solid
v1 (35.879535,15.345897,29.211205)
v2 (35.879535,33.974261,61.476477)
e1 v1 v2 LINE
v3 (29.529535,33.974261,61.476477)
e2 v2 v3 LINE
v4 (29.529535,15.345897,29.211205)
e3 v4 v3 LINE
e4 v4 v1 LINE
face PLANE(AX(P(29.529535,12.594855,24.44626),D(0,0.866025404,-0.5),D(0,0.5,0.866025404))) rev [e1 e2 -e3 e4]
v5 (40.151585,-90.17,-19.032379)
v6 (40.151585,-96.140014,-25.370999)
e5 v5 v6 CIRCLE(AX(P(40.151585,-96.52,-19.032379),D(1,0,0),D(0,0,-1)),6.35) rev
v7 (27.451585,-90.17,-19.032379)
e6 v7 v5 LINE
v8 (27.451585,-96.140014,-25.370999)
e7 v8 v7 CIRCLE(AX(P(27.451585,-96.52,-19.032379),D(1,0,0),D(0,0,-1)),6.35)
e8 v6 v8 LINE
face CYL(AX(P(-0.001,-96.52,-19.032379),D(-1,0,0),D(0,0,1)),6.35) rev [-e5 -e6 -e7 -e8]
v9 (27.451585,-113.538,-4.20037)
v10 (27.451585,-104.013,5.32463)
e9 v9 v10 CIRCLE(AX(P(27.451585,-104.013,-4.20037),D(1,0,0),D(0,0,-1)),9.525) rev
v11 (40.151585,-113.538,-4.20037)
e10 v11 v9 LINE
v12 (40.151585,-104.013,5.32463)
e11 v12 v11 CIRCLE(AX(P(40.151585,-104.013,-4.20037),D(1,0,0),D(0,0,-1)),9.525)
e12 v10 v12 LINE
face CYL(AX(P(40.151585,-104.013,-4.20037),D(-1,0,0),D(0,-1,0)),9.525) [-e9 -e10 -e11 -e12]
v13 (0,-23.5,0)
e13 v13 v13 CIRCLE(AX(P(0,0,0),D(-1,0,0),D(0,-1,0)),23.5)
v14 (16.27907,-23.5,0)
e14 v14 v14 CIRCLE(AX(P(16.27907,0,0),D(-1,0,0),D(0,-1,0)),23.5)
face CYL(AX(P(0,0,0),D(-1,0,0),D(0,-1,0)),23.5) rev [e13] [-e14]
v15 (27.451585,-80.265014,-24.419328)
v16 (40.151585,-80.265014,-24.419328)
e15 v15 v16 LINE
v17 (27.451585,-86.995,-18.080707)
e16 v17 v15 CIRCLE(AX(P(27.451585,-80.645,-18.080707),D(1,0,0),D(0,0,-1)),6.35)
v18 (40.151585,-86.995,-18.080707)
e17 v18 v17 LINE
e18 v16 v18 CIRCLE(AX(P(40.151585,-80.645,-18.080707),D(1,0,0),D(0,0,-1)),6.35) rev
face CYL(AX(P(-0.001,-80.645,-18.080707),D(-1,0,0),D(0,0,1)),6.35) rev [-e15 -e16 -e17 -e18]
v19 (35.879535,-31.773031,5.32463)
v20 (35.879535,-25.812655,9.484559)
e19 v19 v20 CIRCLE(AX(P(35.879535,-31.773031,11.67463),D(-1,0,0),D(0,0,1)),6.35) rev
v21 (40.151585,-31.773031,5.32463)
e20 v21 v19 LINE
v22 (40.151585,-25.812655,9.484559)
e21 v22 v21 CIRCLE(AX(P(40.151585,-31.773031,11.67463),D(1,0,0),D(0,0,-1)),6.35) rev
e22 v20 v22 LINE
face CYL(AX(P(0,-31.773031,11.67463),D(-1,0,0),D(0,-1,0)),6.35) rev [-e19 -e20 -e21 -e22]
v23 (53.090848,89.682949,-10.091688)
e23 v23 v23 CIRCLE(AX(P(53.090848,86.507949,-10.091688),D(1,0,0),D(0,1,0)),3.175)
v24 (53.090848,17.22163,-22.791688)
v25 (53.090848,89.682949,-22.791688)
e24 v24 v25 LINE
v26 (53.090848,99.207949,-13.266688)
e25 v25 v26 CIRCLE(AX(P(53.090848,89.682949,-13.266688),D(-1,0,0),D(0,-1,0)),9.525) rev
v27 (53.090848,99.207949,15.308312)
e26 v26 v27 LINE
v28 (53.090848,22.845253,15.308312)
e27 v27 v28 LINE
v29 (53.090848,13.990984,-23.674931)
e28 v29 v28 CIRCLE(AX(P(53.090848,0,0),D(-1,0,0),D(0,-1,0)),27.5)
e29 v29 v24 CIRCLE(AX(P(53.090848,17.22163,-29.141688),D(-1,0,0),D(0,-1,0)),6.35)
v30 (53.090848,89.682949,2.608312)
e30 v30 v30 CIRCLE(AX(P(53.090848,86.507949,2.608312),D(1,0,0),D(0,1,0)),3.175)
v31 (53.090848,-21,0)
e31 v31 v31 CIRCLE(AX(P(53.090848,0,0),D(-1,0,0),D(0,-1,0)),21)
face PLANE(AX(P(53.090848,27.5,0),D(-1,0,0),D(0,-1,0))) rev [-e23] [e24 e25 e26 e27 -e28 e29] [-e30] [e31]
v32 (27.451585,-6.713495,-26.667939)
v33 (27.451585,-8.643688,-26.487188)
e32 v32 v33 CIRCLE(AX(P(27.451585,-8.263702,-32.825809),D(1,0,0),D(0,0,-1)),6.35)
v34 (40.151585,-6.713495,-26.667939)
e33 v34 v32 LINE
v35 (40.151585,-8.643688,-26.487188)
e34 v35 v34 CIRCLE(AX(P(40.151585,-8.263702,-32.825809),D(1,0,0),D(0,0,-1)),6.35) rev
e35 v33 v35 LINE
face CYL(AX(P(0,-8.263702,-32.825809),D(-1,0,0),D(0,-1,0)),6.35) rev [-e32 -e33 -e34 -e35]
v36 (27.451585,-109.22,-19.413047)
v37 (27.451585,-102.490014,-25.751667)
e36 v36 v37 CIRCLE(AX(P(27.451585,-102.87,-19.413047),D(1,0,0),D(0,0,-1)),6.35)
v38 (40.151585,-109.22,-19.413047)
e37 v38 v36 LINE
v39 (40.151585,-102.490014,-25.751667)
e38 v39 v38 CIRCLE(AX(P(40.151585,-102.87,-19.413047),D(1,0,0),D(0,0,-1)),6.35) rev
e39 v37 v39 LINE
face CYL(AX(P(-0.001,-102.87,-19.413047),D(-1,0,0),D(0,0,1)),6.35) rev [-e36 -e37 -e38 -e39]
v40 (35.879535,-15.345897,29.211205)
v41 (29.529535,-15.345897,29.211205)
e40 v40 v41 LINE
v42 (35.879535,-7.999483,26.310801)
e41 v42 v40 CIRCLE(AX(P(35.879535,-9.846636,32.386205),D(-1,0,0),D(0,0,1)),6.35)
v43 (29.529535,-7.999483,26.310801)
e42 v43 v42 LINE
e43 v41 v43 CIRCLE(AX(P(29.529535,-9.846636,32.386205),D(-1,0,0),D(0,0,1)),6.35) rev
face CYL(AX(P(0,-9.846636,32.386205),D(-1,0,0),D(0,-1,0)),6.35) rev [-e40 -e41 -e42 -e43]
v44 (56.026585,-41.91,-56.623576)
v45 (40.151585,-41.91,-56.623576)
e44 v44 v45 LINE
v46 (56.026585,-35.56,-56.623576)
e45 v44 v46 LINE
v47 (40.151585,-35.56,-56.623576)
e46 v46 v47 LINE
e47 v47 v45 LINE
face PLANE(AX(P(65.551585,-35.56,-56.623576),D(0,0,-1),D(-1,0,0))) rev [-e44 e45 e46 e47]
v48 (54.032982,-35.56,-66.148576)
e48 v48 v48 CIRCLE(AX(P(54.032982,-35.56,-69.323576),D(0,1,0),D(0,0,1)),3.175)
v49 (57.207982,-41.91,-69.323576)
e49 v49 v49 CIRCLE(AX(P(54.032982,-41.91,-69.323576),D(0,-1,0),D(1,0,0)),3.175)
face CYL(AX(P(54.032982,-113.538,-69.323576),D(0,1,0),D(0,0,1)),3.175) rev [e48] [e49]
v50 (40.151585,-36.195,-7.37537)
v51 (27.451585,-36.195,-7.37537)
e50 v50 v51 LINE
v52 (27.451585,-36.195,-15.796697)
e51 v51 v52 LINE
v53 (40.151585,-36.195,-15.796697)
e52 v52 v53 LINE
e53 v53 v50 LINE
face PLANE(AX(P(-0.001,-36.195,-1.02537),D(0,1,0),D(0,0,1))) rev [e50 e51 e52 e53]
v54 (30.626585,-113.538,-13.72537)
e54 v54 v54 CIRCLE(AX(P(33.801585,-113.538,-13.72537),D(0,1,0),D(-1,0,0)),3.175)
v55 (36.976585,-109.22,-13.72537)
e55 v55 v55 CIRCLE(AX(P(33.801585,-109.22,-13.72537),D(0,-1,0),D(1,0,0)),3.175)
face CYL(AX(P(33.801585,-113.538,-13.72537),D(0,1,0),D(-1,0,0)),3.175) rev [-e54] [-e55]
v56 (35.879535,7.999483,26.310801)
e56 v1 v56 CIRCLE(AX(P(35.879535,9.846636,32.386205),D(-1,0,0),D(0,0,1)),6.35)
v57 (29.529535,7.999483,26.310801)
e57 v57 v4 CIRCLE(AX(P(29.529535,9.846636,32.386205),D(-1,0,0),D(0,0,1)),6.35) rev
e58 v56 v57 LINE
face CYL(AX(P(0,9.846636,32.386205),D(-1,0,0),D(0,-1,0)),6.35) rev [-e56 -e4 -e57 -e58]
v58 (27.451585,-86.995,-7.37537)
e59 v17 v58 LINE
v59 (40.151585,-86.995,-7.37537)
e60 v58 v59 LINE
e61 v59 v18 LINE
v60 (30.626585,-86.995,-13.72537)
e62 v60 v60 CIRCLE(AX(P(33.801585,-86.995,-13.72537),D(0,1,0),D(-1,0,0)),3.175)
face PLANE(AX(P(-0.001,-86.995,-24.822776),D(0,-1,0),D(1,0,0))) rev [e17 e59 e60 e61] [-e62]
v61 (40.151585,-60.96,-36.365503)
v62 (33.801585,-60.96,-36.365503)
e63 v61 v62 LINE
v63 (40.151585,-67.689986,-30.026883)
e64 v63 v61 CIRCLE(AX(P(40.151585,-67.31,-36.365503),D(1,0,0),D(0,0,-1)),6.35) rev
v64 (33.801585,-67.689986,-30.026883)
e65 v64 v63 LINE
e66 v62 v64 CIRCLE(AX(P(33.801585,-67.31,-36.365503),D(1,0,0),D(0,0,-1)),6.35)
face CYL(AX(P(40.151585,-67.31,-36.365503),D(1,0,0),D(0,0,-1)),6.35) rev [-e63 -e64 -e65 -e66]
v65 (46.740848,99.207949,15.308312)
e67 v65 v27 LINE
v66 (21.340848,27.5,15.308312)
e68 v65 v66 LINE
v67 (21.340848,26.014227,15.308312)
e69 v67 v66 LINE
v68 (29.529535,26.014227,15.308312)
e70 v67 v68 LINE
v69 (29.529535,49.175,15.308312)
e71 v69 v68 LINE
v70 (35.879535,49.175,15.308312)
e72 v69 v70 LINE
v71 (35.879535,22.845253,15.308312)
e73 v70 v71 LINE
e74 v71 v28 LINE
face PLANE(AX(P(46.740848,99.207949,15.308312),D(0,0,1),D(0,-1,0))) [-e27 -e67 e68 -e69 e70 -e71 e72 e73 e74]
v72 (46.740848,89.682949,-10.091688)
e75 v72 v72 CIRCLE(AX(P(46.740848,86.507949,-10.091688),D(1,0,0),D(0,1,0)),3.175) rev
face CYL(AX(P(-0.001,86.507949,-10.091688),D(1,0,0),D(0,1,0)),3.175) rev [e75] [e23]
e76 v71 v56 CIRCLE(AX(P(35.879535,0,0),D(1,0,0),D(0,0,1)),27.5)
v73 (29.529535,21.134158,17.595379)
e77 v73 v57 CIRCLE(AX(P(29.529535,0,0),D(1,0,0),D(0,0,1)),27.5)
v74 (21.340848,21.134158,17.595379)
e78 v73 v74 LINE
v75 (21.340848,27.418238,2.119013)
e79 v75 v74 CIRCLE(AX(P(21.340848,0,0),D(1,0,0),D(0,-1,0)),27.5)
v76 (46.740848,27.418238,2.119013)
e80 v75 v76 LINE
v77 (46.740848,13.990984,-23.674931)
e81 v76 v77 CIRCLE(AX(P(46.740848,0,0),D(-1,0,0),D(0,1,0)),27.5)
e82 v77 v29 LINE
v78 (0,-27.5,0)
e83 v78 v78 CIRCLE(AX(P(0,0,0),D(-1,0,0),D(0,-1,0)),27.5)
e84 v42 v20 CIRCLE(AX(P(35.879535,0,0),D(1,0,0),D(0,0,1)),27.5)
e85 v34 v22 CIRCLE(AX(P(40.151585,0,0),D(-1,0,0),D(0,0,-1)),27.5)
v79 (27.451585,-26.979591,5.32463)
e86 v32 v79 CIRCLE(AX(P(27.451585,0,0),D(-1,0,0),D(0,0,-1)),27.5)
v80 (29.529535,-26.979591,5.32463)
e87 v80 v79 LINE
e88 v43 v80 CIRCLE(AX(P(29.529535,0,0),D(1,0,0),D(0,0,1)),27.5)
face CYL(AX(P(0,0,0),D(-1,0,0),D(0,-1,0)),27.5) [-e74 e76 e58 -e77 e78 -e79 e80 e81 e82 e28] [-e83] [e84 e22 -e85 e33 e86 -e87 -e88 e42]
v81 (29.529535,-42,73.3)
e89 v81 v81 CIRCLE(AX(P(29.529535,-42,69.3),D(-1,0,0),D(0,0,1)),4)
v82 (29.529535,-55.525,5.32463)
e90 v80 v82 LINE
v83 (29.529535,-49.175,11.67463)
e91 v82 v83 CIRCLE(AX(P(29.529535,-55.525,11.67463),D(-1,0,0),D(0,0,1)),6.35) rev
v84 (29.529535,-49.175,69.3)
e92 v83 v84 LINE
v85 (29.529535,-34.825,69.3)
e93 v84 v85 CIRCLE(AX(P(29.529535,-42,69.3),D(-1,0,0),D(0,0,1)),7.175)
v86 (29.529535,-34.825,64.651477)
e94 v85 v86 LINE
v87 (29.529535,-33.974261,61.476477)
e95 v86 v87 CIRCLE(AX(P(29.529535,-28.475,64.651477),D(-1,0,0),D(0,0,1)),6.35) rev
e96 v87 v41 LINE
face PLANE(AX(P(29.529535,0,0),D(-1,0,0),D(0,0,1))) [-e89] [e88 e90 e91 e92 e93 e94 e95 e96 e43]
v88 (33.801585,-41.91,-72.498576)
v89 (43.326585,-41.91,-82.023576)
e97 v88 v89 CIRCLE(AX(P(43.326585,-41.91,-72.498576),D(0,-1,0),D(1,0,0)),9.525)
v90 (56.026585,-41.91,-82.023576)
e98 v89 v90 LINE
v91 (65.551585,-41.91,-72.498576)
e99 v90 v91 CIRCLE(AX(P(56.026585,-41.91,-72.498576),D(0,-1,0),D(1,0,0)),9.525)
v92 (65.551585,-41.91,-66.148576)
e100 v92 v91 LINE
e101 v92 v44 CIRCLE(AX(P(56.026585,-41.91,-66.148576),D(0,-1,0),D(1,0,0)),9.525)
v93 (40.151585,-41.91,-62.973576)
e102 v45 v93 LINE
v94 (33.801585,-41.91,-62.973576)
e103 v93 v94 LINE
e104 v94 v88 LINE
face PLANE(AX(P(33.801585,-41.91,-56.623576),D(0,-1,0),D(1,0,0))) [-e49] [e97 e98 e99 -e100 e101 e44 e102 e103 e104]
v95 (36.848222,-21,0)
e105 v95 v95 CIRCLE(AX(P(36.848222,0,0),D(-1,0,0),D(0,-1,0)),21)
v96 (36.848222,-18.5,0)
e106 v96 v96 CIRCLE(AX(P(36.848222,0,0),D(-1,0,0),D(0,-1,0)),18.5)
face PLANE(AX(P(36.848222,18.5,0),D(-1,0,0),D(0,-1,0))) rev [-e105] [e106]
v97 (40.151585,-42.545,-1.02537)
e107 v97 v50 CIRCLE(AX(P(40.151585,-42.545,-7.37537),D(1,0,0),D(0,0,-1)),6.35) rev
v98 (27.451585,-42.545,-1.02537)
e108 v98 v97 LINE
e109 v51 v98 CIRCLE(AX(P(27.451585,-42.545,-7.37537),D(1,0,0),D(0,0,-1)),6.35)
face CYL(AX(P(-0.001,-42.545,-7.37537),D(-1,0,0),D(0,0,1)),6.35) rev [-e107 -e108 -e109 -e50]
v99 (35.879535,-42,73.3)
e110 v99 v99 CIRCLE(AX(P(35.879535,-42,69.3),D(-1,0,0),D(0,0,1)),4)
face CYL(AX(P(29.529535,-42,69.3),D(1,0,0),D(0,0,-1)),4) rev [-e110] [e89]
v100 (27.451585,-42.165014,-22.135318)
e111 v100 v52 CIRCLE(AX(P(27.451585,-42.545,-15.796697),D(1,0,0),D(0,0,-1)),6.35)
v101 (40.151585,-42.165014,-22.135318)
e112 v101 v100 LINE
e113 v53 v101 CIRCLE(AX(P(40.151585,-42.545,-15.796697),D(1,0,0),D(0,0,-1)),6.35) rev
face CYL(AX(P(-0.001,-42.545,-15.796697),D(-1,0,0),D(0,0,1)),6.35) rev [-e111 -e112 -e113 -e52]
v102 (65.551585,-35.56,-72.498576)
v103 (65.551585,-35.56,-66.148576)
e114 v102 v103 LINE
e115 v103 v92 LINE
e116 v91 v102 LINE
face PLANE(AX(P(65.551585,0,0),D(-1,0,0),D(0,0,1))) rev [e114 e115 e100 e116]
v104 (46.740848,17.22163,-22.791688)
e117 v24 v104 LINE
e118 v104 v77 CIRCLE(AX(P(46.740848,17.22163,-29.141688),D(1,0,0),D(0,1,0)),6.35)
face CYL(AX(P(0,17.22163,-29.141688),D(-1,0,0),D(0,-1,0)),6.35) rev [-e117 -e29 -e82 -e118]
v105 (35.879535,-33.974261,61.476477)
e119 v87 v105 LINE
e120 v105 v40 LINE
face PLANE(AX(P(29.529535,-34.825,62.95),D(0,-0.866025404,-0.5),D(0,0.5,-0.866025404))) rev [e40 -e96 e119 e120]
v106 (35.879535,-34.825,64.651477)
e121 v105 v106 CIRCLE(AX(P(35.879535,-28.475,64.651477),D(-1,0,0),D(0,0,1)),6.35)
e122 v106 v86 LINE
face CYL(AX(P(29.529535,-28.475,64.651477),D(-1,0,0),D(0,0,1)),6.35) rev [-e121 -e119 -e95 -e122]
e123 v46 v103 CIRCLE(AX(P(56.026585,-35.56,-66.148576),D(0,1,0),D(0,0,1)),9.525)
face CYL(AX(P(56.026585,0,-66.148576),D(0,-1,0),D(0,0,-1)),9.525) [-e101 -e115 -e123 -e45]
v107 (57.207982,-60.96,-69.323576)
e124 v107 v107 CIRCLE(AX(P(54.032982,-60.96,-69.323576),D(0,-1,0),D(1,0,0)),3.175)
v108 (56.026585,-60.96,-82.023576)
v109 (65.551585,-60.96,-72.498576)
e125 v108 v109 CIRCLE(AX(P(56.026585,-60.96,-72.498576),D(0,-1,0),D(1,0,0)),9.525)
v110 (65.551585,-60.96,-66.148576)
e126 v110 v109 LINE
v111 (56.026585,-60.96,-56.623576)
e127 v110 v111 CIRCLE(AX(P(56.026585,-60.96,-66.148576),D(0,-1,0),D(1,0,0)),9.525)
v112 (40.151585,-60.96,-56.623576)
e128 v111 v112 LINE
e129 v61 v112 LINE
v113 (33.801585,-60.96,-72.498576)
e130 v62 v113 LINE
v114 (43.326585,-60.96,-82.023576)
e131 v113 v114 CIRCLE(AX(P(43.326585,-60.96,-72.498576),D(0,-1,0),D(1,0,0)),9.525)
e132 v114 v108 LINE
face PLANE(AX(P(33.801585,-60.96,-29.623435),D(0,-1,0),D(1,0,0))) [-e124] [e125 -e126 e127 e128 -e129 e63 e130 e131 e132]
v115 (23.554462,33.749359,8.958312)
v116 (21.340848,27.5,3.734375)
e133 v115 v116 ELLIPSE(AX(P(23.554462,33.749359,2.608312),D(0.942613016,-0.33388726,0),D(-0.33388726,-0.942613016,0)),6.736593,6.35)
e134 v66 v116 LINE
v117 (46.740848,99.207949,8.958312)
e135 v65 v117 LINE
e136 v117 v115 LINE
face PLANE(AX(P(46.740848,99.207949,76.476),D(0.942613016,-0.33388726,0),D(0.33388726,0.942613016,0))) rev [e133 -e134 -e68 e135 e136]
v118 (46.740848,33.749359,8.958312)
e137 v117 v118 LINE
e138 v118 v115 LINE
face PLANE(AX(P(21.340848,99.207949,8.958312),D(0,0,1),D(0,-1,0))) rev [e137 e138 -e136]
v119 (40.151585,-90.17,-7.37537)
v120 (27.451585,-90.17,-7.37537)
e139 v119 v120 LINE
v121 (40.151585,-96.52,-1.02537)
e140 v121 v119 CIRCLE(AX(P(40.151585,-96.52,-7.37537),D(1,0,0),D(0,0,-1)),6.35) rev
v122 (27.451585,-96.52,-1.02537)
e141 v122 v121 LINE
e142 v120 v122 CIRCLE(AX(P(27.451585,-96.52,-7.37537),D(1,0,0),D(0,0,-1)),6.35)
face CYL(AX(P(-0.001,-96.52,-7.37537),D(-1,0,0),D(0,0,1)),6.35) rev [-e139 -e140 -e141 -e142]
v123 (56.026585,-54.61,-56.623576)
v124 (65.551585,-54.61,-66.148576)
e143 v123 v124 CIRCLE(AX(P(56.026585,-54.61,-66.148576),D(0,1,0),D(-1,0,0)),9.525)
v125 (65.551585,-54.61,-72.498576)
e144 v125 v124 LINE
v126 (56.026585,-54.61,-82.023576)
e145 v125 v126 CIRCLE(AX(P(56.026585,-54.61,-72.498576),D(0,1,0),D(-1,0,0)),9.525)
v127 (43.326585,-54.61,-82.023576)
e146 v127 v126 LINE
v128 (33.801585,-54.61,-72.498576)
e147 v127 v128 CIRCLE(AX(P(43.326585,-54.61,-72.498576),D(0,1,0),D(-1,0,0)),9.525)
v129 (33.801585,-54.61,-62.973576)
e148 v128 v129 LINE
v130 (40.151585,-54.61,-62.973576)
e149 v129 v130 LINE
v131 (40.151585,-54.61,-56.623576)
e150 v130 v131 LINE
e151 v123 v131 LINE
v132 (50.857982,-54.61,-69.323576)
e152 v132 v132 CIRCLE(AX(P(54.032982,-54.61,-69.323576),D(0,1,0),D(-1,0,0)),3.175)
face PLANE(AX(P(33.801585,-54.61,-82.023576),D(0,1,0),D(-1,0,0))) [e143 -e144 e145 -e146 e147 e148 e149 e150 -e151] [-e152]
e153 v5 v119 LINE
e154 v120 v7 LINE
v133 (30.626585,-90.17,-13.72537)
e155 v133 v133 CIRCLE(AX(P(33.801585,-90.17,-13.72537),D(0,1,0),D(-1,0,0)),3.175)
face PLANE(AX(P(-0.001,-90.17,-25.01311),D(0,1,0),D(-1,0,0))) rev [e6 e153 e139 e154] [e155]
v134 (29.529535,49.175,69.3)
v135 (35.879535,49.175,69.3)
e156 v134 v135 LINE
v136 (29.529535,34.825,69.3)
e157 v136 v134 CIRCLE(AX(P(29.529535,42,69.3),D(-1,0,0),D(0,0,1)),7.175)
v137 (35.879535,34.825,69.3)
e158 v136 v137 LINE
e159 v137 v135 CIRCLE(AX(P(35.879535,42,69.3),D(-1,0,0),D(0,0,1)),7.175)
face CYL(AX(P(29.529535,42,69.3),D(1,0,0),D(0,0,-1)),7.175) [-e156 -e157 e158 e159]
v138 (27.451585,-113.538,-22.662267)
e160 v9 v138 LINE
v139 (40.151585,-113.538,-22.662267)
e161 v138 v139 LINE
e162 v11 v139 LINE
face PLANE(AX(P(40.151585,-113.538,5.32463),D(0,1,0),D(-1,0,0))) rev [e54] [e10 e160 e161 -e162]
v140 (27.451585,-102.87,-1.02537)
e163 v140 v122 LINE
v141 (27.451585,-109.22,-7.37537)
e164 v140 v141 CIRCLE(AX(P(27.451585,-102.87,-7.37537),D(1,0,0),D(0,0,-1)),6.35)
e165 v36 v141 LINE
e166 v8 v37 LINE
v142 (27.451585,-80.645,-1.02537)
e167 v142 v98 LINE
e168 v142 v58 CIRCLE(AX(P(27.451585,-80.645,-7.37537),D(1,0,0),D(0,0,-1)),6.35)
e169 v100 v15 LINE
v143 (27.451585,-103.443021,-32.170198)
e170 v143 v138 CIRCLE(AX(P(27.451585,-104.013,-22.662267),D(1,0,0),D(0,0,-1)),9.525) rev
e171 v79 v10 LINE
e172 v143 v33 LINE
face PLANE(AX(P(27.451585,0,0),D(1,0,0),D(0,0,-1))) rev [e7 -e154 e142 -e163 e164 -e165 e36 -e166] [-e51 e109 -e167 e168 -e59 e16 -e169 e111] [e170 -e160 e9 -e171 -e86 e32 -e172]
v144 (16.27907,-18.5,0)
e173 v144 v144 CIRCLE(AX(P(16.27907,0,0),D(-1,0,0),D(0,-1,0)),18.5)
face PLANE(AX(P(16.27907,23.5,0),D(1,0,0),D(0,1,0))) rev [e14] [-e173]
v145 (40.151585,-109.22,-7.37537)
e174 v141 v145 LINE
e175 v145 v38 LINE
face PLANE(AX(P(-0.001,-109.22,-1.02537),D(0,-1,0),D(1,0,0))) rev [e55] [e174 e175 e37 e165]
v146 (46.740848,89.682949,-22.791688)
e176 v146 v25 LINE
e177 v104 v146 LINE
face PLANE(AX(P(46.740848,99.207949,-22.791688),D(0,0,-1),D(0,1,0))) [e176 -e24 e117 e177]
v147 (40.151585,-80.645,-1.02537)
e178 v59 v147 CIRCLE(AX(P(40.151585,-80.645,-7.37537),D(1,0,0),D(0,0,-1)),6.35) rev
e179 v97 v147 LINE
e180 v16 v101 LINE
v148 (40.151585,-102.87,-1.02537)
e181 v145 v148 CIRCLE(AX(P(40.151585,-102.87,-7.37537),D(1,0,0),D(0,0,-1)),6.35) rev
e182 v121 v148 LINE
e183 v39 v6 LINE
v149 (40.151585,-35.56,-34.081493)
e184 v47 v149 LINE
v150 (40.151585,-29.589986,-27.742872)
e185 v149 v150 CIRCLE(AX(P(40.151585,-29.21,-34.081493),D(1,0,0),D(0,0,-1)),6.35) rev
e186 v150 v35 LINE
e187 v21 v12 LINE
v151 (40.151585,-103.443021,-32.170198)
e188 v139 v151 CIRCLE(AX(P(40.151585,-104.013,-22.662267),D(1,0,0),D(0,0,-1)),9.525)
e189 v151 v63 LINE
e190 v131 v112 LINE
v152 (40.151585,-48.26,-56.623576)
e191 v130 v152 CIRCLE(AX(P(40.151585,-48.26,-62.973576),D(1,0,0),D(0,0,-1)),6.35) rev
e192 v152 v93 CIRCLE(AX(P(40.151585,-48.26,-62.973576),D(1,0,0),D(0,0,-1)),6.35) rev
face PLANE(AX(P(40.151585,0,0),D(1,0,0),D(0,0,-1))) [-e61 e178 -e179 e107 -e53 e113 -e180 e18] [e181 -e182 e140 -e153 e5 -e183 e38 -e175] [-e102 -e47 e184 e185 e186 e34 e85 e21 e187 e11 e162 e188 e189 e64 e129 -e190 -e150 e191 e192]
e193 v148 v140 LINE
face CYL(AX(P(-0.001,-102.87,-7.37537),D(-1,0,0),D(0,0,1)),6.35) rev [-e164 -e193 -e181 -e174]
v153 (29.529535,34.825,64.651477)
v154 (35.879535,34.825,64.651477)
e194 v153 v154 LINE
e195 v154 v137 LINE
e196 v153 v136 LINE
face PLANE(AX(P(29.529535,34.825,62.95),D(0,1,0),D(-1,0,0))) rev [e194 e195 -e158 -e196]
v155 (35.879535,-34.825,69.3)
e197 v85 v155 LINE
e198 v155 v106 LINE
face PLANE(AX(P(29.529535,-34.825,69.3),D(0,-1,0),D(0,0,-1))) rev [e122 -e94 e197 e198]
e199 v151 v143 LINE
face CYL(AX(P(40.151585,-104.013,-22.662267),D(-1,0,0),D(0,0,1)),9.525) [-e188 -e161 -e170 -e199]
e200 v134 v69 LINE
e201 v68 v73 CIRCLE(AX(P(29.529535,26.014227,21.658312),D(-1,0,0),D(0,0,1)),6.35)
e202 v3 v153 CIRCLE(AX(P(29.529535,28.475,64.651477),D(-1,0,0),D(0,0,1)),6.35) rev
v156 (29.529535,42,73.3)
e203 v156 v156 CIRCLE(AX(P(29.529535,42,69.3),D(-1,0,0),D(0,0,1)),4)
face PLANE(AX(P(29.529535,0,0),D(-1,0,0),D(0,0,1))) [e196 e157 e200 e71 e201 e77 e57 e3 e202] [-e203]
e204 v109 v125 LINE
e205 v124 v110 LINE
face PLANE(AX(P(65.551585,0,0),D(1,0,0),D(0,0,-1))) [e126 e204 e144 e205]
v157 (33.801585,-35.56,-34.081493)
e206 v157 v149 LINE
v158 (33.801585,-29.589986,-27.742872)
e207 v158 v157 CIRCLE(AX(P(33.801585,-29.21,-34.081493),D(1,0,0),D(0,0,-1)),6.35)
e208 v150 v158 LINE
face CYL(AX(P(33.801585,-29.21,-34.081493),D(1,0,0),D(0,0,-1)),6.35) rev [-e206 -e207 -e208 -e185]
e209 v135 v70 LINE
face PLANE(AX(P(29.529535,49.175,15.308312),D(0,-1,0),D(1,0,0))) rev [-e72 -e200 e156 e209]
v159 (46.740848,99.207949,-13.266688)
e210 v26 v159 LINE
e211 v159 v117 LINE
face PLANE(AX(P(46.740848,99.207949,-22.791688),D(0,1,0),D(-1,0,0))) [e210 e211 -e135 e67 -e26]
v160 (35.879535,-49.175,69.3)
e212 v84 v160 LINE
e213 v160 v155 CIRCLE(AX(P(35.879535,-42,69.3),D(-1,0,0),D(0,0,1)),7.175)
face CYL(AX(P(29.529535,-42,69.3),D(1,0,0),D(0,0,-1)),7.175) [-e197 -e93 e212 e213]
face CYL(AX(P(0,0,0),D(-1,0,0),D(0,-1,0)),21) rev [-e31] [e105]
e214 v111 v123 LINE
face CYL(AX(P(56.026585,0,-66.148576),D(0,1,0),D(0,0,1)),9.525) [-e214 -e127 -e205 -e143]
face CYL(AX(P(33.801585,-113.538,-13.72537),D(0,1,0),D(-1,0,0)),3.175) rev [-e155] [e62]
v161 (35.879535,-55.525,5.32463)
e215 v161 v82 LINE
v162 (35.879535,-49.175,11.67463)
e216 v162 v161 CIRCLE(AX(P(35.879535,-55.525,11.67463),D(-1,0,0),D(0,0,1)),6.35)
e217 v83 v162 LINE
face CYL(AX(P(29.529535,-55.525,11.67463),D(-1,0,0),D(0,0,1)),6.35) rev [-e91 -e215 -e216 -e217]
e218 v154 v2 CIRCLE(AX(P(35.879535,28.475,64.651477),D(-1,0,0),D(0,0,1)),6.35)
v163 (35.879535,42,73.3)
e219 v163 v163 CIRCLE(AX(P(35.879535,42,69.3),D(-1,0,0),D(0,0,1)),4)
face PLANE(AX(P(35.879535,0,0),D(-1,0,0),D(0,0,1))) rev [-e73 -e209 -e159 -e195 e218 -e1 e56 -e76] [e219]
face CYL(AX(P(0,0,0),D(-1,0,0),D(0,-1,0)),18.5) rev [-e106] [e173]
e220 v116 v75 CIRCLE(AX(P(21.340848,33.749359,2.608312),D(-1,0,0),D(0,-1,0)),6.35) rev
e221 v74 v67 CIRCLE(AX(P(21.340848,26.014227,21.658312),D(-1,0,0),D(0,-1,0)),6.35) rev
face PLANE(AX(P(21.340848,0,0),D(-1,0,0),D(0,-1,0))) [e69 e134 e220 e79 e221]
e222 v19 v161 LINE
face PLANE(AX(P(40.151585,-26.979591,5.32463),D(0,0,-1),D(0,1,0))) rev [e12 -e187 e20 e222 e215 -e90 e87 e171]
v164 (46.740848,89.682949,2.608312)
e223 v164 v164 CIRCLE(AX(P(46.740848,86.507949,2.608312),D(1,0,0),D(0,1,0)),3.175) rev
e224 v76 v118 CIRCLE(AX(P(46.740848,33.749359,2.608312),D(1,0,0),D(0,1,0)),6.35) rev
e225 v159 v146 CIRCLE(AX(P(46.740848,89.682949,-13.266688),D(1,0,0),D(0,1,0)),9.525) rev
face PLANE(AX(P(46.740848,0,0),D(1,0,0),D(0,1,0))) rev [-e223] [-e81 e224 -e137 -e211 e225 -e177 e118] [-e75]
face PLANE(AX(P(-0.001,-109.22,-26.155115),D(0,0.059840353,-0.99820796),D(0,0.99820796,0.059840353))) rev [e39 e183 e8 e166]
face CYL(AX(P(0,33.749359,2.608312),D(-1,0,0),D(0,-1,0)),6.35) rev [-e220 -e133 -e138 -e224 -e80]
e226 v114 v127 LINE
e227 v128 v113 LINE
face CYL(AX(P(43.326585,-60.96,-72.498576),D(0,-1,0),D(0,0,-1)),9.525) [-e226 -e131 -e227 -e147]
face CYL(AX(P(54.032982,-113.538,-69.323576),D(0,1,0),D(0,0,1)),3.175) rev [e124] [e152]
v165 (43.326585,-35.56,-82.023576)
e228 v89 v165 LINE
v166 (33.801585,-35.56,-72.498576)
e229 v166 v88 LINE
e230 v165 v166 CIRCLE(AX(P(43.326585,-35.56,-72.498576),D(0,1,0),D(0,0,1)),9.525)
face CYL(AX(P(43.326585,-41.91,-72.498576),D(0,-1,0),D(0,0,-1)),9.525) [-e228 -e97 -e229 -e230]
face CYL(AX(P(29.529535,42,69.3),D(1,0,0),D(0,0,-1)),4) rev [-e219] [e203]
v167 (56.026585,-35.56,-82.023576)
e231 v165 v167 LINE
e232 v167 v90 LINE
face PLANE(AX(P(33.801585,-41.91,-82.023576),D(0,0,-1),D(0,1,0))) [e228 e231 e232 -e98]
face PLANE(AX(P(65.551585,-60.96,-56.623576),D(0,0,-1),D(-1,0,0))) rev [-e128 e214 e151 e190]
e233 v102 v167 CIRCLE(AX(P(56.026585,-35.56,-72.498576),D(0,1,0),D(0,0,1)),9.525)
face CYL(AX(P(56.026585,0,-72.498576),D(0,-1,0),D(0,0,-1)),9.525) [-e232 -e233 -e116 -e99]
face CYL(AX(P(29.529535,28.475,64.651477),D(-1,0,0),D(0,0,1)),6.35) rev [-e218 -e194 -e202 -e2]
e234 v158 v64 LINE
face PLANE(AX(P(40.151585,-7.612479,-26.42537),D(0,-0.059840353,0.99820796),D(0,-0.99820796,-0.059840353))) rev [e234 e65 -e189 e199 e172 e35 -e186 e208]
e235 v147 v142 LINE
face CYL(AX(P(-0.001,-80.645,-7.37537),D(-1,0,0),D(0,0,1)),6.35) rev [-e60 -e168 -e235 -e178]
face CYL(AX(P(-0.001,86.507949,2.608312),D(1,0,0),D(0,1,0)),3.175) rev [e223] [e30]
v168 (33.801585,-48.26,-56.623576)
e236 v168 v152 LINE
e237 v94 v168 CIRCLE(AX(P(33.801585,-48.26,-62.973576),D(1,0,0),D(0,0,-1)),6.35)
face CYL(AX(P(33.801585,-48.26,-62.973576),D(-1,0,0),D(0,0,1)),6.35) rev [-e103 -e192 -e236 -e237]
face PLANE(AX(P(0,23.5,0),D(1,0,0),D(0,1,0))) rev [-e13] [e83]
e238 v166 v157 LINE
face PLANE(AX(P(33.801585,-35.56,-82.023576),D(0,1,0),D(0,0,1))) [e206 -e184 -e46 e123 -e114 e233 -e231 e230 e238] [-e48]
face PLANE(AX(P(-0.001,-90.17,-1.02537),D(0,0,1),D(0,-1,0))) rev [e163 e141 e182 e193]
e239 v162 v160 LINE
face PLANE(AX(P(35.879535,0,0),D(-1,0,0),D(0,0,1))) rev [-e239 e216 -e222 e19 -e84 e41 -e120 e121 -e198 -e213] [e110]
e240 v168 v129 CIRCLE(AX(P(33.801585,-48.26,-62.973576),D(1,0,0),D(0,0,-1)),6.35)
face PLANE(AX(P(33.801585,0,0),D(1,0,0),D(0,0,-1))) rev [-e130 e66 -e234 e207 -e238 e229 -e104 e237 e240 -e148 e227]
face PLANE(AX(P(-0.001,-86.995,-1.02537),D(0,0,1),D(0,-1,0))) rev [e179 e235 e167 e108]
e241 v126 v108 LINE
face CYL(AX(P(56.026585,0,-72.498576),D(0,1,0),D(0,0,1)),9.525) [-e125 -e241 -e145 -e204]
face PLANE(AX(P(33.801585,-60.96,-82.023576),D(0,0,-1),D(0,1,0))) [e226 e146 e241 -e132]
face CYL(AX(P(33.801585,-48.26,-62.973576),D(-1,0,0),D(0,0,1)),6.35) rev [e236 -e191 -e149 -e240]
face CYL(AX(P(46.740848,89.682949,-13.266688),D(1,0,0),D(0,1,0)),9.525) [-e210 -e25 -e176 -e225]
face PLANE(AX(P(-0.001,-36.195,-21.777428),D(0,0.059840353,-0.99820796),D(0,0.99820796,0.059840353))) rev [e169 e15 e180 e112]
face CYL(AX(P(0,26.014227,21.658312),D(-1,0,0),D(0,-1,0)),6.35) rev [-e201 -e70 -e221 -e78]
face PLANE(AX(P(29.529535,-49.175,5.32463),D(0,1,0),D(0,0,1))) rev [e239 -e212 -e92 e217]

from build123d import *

# Parameters (mm, degrees)
BOSS_EXTRUDE1_START      = -6.35
BOSS_EXTRUDE1_DEPTH      = 6.35
BOSS_EXTRUDE2_DEPTH      = 6.35
BOSS_EXTRUDE2_DEPTH_BACK = 6.35
BOSS_EXTRUDE3_DEPTH      = 6.35
SKETCH6_W                = 25.4
SKETCH6_H                = 6.35
BOSS_EXTRUDE4_DEPTH      = 25.4
BOSS_EXTRUDE5_START      = 25.4
BOSS_EXTRUDE5_DEPTH      = 25.4
BOSS_EXTRUDE6_START      = 6.35
BOSS_EXTRUDE6_DEPTH      = 6.35
BOSS_EXTRUDE7_START      = 6.35
BOSS_EXTRUDE7_DEPTH      = 6.35
CUT_EXTRUDE1_REACH       = 161.579
CUT_EXTRUDE2_REACH       = 147.708
SKETCH14_R               = 3.175
CUT_EXTRUDE3_DEPTH       = 214.767199478
CUT_EXTRUDE4_REACH       = 151.791
SKETCH15_R               = 3.175
SKETCH16_R               = 3.175
CUT_EXTRUDE5_DEPTH       = 171.84284427
F_0_25_FILLET4_R         = 6.35
FILLET1_R                = 9.525


with BuildPart() as part:
    # Sketch1 → Revolve1 (revolve)
    with BuildSketch(Plane.XY, mode=Mode.PRIVATE) as revolve1_sk:
        Polygon((0, 23.5), (16.279070312, 23.5), (16.279070312, 18.5), (36.848222468, 18.5), (36.848222468, 21), (53.090847844, 21), (53.090847844, 27.5), (0, 27.5), align=None)
    revolve(revolve1_sk.sketch.rotate(Axis((0, 0, 0), (1, 0, 0)), 180), axis=Axis((0, 0, 0), (1, 0, 0)))

    # Sketch2 → Boss-Extrude1 (add)
    with BuildSketch(Plane(origin=(53.090847844, 0, 0), x_dir=(0, 0, -1), z_dir=(1, 0, 0)).offset(BOSS_EXTRUDE1_START)):
        with BuildLine():
            Line((22.791687671, 99.207948957), (22.791687671, 15.387948957))
            ThreePointArc((22.791687671, 15.387948957), (5.282335812, 26.987903371), (-15.308312329, 22.84525276))
            Line((-15.308312329, 22.84525276), (-15.308312329, 99.207948957))
            Line((-15.308312329, 99.207948957), (22.791687671, 99.207948957))
        make_face()
    extrude(amount=BOSS_EXTRUDE1_DEPTH)

    # Sketch4 → Boss-Extrude2 (add, two sides: drawn at the far end of the back side and taken through both)
    with BuildSketch(Plane(origin=(33.801584976, 0, 0), x_dir=(0, 0, -1), z_dir=(1, 0, 0)).offset(-BOSS_EXTRUDE2_DEPTH_BACK)):
        with BuildLine():
            Line((26.425369625, -7.612479241), (32.775369625, -113.538))
            Line((32.775369625, -113.538), (-5.324630375, -113.538))
            Line((-5.324630375, -113.538), (-5.324630375, -26.979590645))
            ThreePointArc((-5.324630375, -26.979590645), (14.320668639, -23.476977015), (26.425369625, -7.612479241))
        make_face()
    extrude(amount=BOSS_EXTRUDE2_DEPTH + BOSS_EXTRUDE2_DEPTH_BACK)

    # Sketch5 → Boss-Extrude3 (add)
    with BuildSketch(Plane(origin=(40.151584976, 0, 0), x_dir=(0, 0, -1), z_dir=(1, 0, 0))):
        Polygon((29.623435156, -60.96), (82.023576364, -60.96), (82.023576364, -54.61), (56.623576364, -54.61), (56.623576364, -41.91), (82.023576364, -41.91), (82.023576364, -35.56), (28.1007615, -35.56), align=None)
    extrude(amount=-BOSS_EXTRUDE3_DEPTH)

    # Sketch6 → Boss-Extrude4 (add)
    with BuildSketch(Plane(origin=(40.151584976, 0, 0), x_dir=(0, 0, -1), z_dir=(1, 0, 0))):
        with Locations((69.323576364, -38.735)):
            Rectangle(SKETCH6_W, SKETCH6_H)
        with Locations((69.323576364, -57.785)):
            Rectangle(SKETCH6_W, SKETCH6_H)
    extrude(amount=BOSS_EXTRUDE4_DEPTH)

    # Sketch7 → Boss-Extrude5 (add)
    with BuildSketch(Plane.ZY.offset(-46.740847844).offset(BOSS_EXTRUDE5_START)):
        with BuildLine():
            Line((15.308312329, 22.84525276), (15.308312329, 99.207948957))
            Line((15.308312329, 99.207948957), (8.958312329, 99.207948957))
            Line((8.958312329, 99.207948957), (8.958312329, 25.99997385))
            ThreePointArc((8.958312329, 25.99997385), (12.235413126, 24.62812753), (15.308312329, 22.84525276))
        make_face()
    extrude(amount=-BOSS_EXTRUDE5_DEPTH)

    # Sketch8 → Boss-Extrude6 (add)
    with BuildSketch(Plane.ZY.offset(-35.879535156).offset(BOSS_EXTRUDE6_START)):
        with BuildLine():
            Line((15.308312329, 49.175), (69.3, 49.175))
            ThreePointArc((69.3, 49.175), (76.475, 42), (69.3, 34.825))
            Line((69.3, 34.825), (62.95, 34.825))
            Line((62.95, 34.825), (24.446259855, 12.594855263))
            ThreePointArc((24.446259855, 12.594855263), (20.527400337, 18.299612985), (15.308312329, 22.84525276))
            Line((15.308312329, 22.84525276), (15.308312329, 49.175))
        make_face()
        with BuildLine():
            ThreePointArc((69.3, 38.000000001), (73.299999999, 42), (69.3, 46.000000001))
            ThreePointArc((69.3, 46.000000001), (65.299999999, 42), (69.3, 38.000000001))
        make_face(mode=Mode.SUBTRACT)
    extrude(amount=-BOSS_EXTRUDE6_DEPTH)

    # Sketch9 → Boss-Extrude7 (add)
    with BuildSketch(Plane.ZY.offset(-35.879535156).offset(BOSS_EXTRUDE7_START)):
        with BuildLine():
            Line((5.324630375, -49.174999998), (69.3, -49.174999998))
            ThreePointArc((69.3, -49.174999998), (76.474999998, -42), (69.3, -34.825000002))
            Line((69.3, -34.825000002), (62.95, -34.825000002))
            Line((62.95, -34.825000002), (24.446259854, -12.594855264))
            ThreePointArc((24.446259854, -12.594855264), (16.531988061, -21.975972578), (5.324630375, -26.979590645))
            Line((5.324630375, -26.979590645), (5.324630375, -49.174999998))
        make_face()
        with BuildLine():
            ThreePointArc((69.3, -46.000000001), (73.300000001, -42), (69.3, -38.000000001))
            ThreePointArc((69.3, -38.000000001), (65.300000001, -42), (69.3, -46.000000001))
        make_face(mode=Mode.SUBTRACT)
    extrude(amount=-BOSS_EXTRUDE7_DEPTH)

    # Sketch10 → Cut-Extrude1 (cut, up to next)
    with BuildSketch(Plane(origin=(0, 0, 8.958312329), x_dir=(-1, 0, 0), z_dir=(0, 0, -1)), mode=Mode.PRIVATE) as cut_extrude1_sk1:
        Polygon((-46.740847844, 99.207948957), (-21.340847844, 27.5), (-21.340847844, 99.207948957), align=None)
    cut_extrude1_tool1 = extrude(cut_extrude1_sk1.sketch, amount=-CUT_EXTRUDE1_REACH, mode=Mode.PRIVATE) & part.part
    add(cut_extrude1_tool1.solids().sort_by_distance((29.807515, 75.305299, 8.958312))[0], mode=Mode.SUBTRACT)

    # Sketch13 → Cut-Extrude2 (cut, up to next)
    with BuildSketch(Plane(origin=(40.151584976, 0, 0), x_dir=(0, 0, -1), z_dir=(1, 0, 0)), mode=Mode.PRIVATE) as cut_extrude2_sk1:
        Polygon((26.155115223, -109.22), (25.01310998, -90.17), (1.025369625, -90.17), (1.025369625, -109.22), align=None)
    cut_extrude2_tool1 = extrude(cut_extrude2_sk1.sketch, amount=-CUT_EXTRUDE2_REACH, mode=Mode.PRIVATE) & part.part
    # Sketch13 → Cut-Extrude2 (cut, up to next)
    with BuildSketch(Plane(origin=(40.151584976, 0, 0), x_dir=(0, 0, -1), z_dir=(1, 0, 0)), mode=Mode.PRIVATE) as cut_extrude2_sk2:
        Polygon((21.77742846, -36.195), (24.822775773, -86.995), (1.025369625, -86.995), (1.025369625, -36.195), align=None)
    cut_extrude2_tool2 = extrude(cut_extrude2_sk2.sketch, amount=-CUT_EXTRUDE2_REACH, mode=Mode.PRIVATE) & part.part
    add(cut_extrude2_tool1.solids().sort_by_distance((40.151585, -99.76882, -13.306954))[0], mode=Mode.SUBTRACT)
    add(cut_extrude2_tool2.solids().sort_by_distance((40.151585, -62.173771, -12.180084))[0], mode=Mode.SUBTRACT)

    # Sketch14 → Cut-Extrude3 (cut, through all)
    with BuildSketch(Plane(origin=(0, -86.995, 0), x_dir=(1, 0, 0), z_dir=(0, 1, 0))):
        with Locations(Location((33.801584976, 13.725369625, 0), (0, 0, 180))):
            Circle(SKETCH14_R)
    extrude(amount=-CUT_EXTRUDE3_DEPTH, mode=Mode.SUBTRACT)

    # Sketch15 → Cut-Extrude4 (cut, up to next)
    with BuildSketch(Plane(origin=(53.090847844, 0, 0), x_dir=(0, 0, -1), z_dir=(1, 0, 0)), mode=Mode.PRIVATE) as cut_extrude4_sk1:
        with Locations(Location((-2.608312329, 86.507948957, 0), (0, 0, 90))):
            Circle(SKETCH15_R)
    cut_extrude4_tool1 = extrude(cut_extrude4_sk1.sketch, amount=-CUT_EXTRUDE4_REACH, mode=Mode.PRIVATE) & part.part
    # Sketch15 → Cut-Extrude4 (cut, up to next)
    with BuildSketch(Plane(origin=(53.090847844, 0, 0), x_dir=(0, 0, -1), z_dir=(1, 0, 0)), mode=Mode.PRIVATE) as cut_extrude4_sk2:
        with Locations(Location((10.091687671, 86.507948957, 0), (0, 0, 90))):
            Circle(SKETCH15_R)
    cut_extrude4_tool2 = extrude(cut_extrude4_sk2.sketch, amount=-CUT_EXTRUDE4_REACH, mode=Mode.PRIVATE) & part.part
    add(cut_extrude4_tool1.solids().sort_by_distance((53.090848, 86.507949, 2.608312))[0], mode=Mode.SUBTRACT)
    add(cut_extrude4_tool2.solids().sort_by_distance((53.090848, 86.507949, -10.091688))[0], mode=Mode.SUBTRACT)

    # Sketch16 → Cut-Extrude5 (cut, through all)
    with BuildSketch(Plane(origin=(0, -35.56, 0), x_dir=(1, 0, 0), z_dir=(0, 1, 0))):
        with Locations(Location((54.032981596, 69.323576364, 0), (0, 0, 180))):
            Circle(SKETCH16_R)
    extrude(amount=-CUT_EXTRUDE5_DEPTH, mode=Mode.SUBTRACT)

    # 0.25 Fillet4
    # the kernel refuses this fillet: 6.35 mm, written as the material it adds along each edge
    with BuildSketch(Plane(origin=(29.529535156, -34.825000002, 62.95), x_dir=(0, 0.49999999999999617, -0.8660254037844408), z_dir=(1, 0, 0))) as f_0_25_fillet4_piece_1:
        with BuildLine():
            CenterArc((F_0_25_FILLET4_R * 0.267949192431, F_0_25_FILLET4_R), F_0_25_FILLET4_R, 240, 30)
            Line((-F_0_25_FILLET4_R * 0.232050807569, F_0_25_FILLET4_R * 0.133974596216), (0, 0))
            Line((0, 0), (F_0_25_FILLET4_R * 0.267949192431, 0))
        make_face()
    extrude(amount=6.35)
    with BuildSketch(Plane(origin=(29.529535156, 34.825, 62.95), x_dir=(0, -0.49999999999999967, -0.8660254037844389), z_dir=(1, 0, 0))) as f_0_25_fillet4_piece_2:
        with BuildLine():
            CenterArc((F_0_25_FILLET4_R * 0.267949192431, -F_0_25_FILLET4_R), F_0_25_FILLET4_R, 90, 30)
            Line((-F_0_25_FILLET4_R * 0.232050807569, -F_0_25_FILLET4_R * 0.133974596216), (0, 0))
            Line((0, 0), (F_0_25_FILLET4_R * 0.267949192431, 0))
        make_face()
    extrude(amount=6.35)
    with BuildSketch(Plane(origin=(29.529535156, 22.84525276, 15.308312329), x_dir=(0, -0.5990573223008338, 0.800706141226452), z_dir=(-1, 0, 0))) as f_0_25_fillet4_piece_3:
        with BuildLine():
            CenterArc((3.186086766, 6.341431143), F_0_25_FILLET4_R, 216.80241312, 50.220708616)
            Line((-1.898397231, 2.537417146), (0, 0))
            ThreePointArc((0, 0), (1.428156252, 0.037109225), (2.856312504, 0))
        make_face()
    extrude(amount=8.188687312)
    with BuildSketch(Plane(origin=(40.151584976, -54.61, -56.623576364), x_dir=(0, 1, 0), z_dir=(-1, 0, 0))) as f_0_25_fillet4_piece_4:
        with BuildLine():
            CenterArc((F_0_25_FILLET4_R, F_0_25_FILLET4_R), F_0_25_FILLET4_R, 180, 90)
            Line((0, F_0_25_FILLET4_R), (0, 0))
            Line((0, 0), (F_0_25_FILLET4_R, 0))
        make_face()
    extrude(amount=6.35)
    with BuildSketch(Plane(origin=(40.151584976, -41.91, -56.623576364), x_dir=(0, -1, 0), z_dir=(-1, 0, 0)), Plane(origin=(29.529535156, -49.174999998, 5.324630375), x_dir=(0, -1, 0), z_dir=(1, 0, 0))) as f_0_25_fillet4_piece_5:
        with BuildLine():
            CenterArc((F_0_25_FILLET4_R, -F_0_25_FILLET4_R), F_0_25_FILLET4_R, 90, 90)
            Line((0, -F_0_25_FILLET4_R), (0, 0))
            Line((0, 0), (F_0_25_FILLET4_R, 0))
        make_face()
    extrude(amount=6.35)
    with BuildSketch(Plane(origin=(40.151584976, -109.22, -1.025369625), x_dir=(0, 0, -1), z_dir=(-1, 0, 0)), Plane(origin=(40.151584976, -90.17, -1.025369625), x_dir=(0, -1, 0), z_dir=(-1, 0, 0)), Plane(origin=(40.151584976, -86.995, -1.025369625), x_dir=(0, 0, -1), z_dir=(-1, 0, 0)), Plane(origin=(40.151584976, -36.195, -1.025369625), x_dir=(0, -1, 0), z_dir=(-1, 0, 0))) as f_0_25_fillet4_piece_6:
        with BuildLine():
            CenterArc((F_0_25_FILLET4_R, -F_0_25_FILLET4_R), F_0_25_FILLET4_R, 90, 90)
            Line((0, -F_0_25_FILLET4_R), (0, 0))
            Line((0, 0), (F_0_25_FILLET4_R, 0))
        make_face()
    extrude(amount=12.7)
    with BuildSketch(Plane(origin=(40.151584976, -109.22, -26.155115223), x_dir=(0, 0, 1), z_dir=(-1, 0, 0))) as f_0_25_fillet4_piece_7:
        with BuildLine():
            CenterArc((F_0_25_FILLET4_R * 1.06174303854, F_0_25_FILLET4_R), F_0_25_FILLET4_R, 176.5693508, 93.4306492)
            Line((F_0_25_FILLET4_R * 0.063535078166, F_0_25_FILLET4_R * 1.05984035295), (0, 0))
            Line((0, 0), (F_0_25_FILLET4_R * 1.06174303854, 0))
        make_face()
    extrude(amount=12.7)
    with BuildSketch(Plane(origin=(40.151584976, -90.17, -25.01310998), x_dir=(0, 0, 1), z_dir=(-1, 0, 0))) as f_0_25_fillet4_piece_8:
        with BuildLine():
            CenterArc((F_0_25_FILLET4_R * 0.941847475047, -F_0_25_FILLET4_R), F_0_25_FILLET4_R, 90, 86.5693508)
            Line((-F_0_25_FILLET4_R * 0.0563604853296, -F_0_25_FILLET4_R * 0.940159647052), (0, 0))
            Line((0, 0), (F_0_25_FILLET4_R * 0.941847475047, 0))
        make_face()
    extrude(amount=12.7)
    with BuildSketch(Plane(origin=(40.151584976, -86.995, -24.822775773), x_dir=(0, 0.9982079603765488, 0.05984035294757458), z_dir=(-1, 0, 0))) as f_0_25_fillet4_piece_9:
        with BuildLine():
            CenterArc((F_0_25_FILLET4_R * 1.06174303854, -F_0_25_FILLET4_R), F_0_25_FILLET4_R, 90, 93.4306492)
            Line((F_0_25_FILLET4_R * 0.063535078166, -F_0_25_FILLET4_R * 1.05984035295), (0, 0))
            Line((0, 0), (F_0_25_FILLET4_R * 1.06174303854, 0))
        make_face()
    extrude(amount=12.7)
    with BuildSketch(Plane(origin=(27.451584976, -7.612479241, -26.425369625), x_dir=(0, 0.9654712583471952, -0.26050959541921553), z_dir=(1, 0, 0))) as f_0_25_fillet4_piece_10:
        with BuildLine():
            CenterArc((1.038638906, -6.34908993), F_0_25_FILLET4_R, 90.970048392, 17.560902681)
            Line((-0.979498363, -0.328324035), (0, 0))
            ThreePointArc((0, 0), (0.465567562, -0.003941249), (0.931135124, 0))
        make_face()
    extrude(amount=12.7)
    with BuildSketch(Plane(origin=(40.151584976, -36.195, -21.77742846), x_dir=(0, -0.9982079603765489, -0.05984035294757416), z_dir=(-1, 0, 0))) as f_0_25_fillet4_piece_11:
        with BuildLine():
            CenterArc((F_0_25_FILLET4_R * 0.941847475047, F_0_25_FILLET4_R), F_0_25_FILLET4_R, 183.4306492, 86.5693508)
            Line((-F_0_25_FILLET4_R * 0.0563604853296, F_0_25_FILLET4_R * 0.940159647052), (0, 0))
            Line((0, 0), (F_0_25_FILLET4_R * 0.941847475047, 0))
        make_face()
    extrude(amount=12.7)
    with BuildSketch(Plane(origin=(40.151584976, -60.96, -29.623435156), x_dir=(0, -0.9982079603765488, -0.05984035294757458), z_dir=(-1, 0, 0))) as f_0_25_fillet4_piece_12:
        with BuildLine():
            CenterArc((F_0_25_FILLET4_R * 1.06174303854, -F_0_25_FILLET4_R), F_0_25_FILLET4_R, 90, 93.4306492)
            Line((F_0_25_FILLET4_R * 0.063535078166, -F_0_25_FILLET4_R * 1.05984035295), (0, 0))
            Line((0, 0), (F_0_25_FILLET4_R * 1.06174303854, 0))
        make_face()
    extrude(amount=6.35)
    with BuildSketch(Plane(origin=(40.151584976, -35.56, -28.1007615), x_dir=(0, 0.9982079603765489, 0.05984035294757479), z_dir=(-1, 0, 0))) as f_0_25_fillet4_piece_13:
        with BuildLine():
            CenterArc((F_0_25_FILLET4_R * 0.941847475047, F_0_25_FILLET4_R), F_0_25_FILLET4_R, 183.4306492, 86.5693508)
            Line((-F_0_25_FILLET4_R * 0.0563604853296, F_0_25_FILLET4_R * 0.940159647052), (0, 0))
            Line((0, 0), (F_0_25_FILLET4_R * 0.941847475047, 0))
        make_face()
    extrude(amount=6.35)
    with BuildSketch(Plane(origin=(29.529535156, -12.594855264, 24.446259854), x_dir=(0, 0.9266302092084975, 0.3759740089184572), z_dir=(1, 0, 0))) as f_0_25_fillet4_piece_14:
        with BuildLine():
            CenterArc((5.531795753, 6.32413382), F_0_25_FILLET4_R, 187.91547467, 76.911263612)
            Line((-0.757703387, 5.449662228), (0, 0))
            ThreePointArc((0, 0), (2.479615048, 0.112018891), (4.959230096, 0))
        make_face()
    extrude(amount=6.35)
    with BuildSketch(Plane(origin=(29.529535156, 12.594855263, 24.446259855), x_dir=(0, -0.9266302092337214, 0.3759740088562898), z_dir=(1, 0, 0))) as f_0_25_fillet4_piece_15:
        with BuildLine():
            CenterArc((5.531795752, -6.32413382), F_0_25_FILLET4_R, 95.173261718, 76.911263608)
            Line((-0.757703388, -5.449662227), (0, 0))
            ThreePointArc((0, 0), (2.479615048, -0.112018891), (4.959230096, 0))
        make_face()
    extrude(amount=6.35)
    with BuildSketch(Plane(origin=(21.340847844, 25.99997385, 8.958312329), x_dir=(0, 0.20304997506833786, -0.9791683755232026), z_dir=(1, 0, 0))) as f_0_25_fillet4_piece_16_section:
        with BuildLine():
            CenterArc((7.791231567, 6.298585148), F_0_25_FILLET4_R, 168.284629793, 94.419307905)
            Line((1.573512383, 7.587952489), (0, 0))
            ThreePointArc((0, 0), (3.492402088, 0.222662746), (6.984804176, 0))
        make_face()
    f_0_25_fillet4_piece_16 = extrude(amount=44.773461907, mode=Mode.PRIVATE)
    f_0_25_fillet4_piece_16 = split(f_0_25_fillet4_piece_16, bisect_by=Plane(origin=(53.090847844, 28.245025777, 7.377553375), z_dir=(-1, 0, 0)), keep=Keep.TOP, mode=Mode.PRIVATE)
    f_0_25_fillet4_piece_16 = split(f_0_25_fillet4_piece_16, bisect_by=Plane(origin=(23.009046409, 32.20957077, 7.377553375), z_dir=(0.9426130158079032, -0.33388726005873554, 0)), keep=Keep.TOP, mode=Mode.PRIVATE)
    add(f_0_25_fillet4_piece_16)
    with BuildSketch(Plane(origin=(46.740847844, 15.387948957, -22.791687671), x_dir=(0, -0.845229325073702, -0.5344037687324578), z_dir=(1, 0, 0))) as f_0_25_fillet4_piece_17:
        with BuildLine():
            CenterArc((1.843582945, 6.347132271), F_0_25_FILLET4_R, 237.696514491, 30.581473676)
            Line((-1.549880986, 0.979926057), (0, 0))
            ThreePointArc((0, 0), (0.826381923, 0.012419297), (1.652763847, 0))
        make_face()
    extrude(amount=6.35)
    with BuildSketch(Plane(origin=(35.879535156, -26.979590645, 5.324630375), x_dir=(0, 0.27009263265411193, 0.9628343418189709), z_dir=(1, 0, 0))) as f_0_25_fillet4_piece_18:
        with BuildLine():
            CenterArc((4.819325117, 6.330377308), F_0_25_FILLET4_R, 195.669779106, 69.824731579)
            Line((-1.294672953, 4.61528909), (0, 0))
            ThreePointArc((0, 0), (2.160251683, 0.084980163), (4.320503365, 0))
        make_face()
    extrude(amount=4.27204982)

    # Fillet1
    fillet1_edges = [part.edges().sort_by_distance(p)[0] for p in [
        (49.915847844, 99.207948957, -22.791687671),
        (33.801584976, -113.538, 5.324630375),
        (33.801584976, -113.538, -32.775369625),
        (33.801584976, -38.735, -82.023576364),
        (33.801584976, -57.785, -82.023576364),
        (65.551584976, -38.735, -82.023576364),
        (65.551584976, -38.735, -56.623576364),
        (65.551584976, -57.785, -82.023576364),
        (65.551584976, -57.785, -56.623576364),
    ]]
    fillet(fillet1_edges, radius=FILLET1_R)


solid = part.part
